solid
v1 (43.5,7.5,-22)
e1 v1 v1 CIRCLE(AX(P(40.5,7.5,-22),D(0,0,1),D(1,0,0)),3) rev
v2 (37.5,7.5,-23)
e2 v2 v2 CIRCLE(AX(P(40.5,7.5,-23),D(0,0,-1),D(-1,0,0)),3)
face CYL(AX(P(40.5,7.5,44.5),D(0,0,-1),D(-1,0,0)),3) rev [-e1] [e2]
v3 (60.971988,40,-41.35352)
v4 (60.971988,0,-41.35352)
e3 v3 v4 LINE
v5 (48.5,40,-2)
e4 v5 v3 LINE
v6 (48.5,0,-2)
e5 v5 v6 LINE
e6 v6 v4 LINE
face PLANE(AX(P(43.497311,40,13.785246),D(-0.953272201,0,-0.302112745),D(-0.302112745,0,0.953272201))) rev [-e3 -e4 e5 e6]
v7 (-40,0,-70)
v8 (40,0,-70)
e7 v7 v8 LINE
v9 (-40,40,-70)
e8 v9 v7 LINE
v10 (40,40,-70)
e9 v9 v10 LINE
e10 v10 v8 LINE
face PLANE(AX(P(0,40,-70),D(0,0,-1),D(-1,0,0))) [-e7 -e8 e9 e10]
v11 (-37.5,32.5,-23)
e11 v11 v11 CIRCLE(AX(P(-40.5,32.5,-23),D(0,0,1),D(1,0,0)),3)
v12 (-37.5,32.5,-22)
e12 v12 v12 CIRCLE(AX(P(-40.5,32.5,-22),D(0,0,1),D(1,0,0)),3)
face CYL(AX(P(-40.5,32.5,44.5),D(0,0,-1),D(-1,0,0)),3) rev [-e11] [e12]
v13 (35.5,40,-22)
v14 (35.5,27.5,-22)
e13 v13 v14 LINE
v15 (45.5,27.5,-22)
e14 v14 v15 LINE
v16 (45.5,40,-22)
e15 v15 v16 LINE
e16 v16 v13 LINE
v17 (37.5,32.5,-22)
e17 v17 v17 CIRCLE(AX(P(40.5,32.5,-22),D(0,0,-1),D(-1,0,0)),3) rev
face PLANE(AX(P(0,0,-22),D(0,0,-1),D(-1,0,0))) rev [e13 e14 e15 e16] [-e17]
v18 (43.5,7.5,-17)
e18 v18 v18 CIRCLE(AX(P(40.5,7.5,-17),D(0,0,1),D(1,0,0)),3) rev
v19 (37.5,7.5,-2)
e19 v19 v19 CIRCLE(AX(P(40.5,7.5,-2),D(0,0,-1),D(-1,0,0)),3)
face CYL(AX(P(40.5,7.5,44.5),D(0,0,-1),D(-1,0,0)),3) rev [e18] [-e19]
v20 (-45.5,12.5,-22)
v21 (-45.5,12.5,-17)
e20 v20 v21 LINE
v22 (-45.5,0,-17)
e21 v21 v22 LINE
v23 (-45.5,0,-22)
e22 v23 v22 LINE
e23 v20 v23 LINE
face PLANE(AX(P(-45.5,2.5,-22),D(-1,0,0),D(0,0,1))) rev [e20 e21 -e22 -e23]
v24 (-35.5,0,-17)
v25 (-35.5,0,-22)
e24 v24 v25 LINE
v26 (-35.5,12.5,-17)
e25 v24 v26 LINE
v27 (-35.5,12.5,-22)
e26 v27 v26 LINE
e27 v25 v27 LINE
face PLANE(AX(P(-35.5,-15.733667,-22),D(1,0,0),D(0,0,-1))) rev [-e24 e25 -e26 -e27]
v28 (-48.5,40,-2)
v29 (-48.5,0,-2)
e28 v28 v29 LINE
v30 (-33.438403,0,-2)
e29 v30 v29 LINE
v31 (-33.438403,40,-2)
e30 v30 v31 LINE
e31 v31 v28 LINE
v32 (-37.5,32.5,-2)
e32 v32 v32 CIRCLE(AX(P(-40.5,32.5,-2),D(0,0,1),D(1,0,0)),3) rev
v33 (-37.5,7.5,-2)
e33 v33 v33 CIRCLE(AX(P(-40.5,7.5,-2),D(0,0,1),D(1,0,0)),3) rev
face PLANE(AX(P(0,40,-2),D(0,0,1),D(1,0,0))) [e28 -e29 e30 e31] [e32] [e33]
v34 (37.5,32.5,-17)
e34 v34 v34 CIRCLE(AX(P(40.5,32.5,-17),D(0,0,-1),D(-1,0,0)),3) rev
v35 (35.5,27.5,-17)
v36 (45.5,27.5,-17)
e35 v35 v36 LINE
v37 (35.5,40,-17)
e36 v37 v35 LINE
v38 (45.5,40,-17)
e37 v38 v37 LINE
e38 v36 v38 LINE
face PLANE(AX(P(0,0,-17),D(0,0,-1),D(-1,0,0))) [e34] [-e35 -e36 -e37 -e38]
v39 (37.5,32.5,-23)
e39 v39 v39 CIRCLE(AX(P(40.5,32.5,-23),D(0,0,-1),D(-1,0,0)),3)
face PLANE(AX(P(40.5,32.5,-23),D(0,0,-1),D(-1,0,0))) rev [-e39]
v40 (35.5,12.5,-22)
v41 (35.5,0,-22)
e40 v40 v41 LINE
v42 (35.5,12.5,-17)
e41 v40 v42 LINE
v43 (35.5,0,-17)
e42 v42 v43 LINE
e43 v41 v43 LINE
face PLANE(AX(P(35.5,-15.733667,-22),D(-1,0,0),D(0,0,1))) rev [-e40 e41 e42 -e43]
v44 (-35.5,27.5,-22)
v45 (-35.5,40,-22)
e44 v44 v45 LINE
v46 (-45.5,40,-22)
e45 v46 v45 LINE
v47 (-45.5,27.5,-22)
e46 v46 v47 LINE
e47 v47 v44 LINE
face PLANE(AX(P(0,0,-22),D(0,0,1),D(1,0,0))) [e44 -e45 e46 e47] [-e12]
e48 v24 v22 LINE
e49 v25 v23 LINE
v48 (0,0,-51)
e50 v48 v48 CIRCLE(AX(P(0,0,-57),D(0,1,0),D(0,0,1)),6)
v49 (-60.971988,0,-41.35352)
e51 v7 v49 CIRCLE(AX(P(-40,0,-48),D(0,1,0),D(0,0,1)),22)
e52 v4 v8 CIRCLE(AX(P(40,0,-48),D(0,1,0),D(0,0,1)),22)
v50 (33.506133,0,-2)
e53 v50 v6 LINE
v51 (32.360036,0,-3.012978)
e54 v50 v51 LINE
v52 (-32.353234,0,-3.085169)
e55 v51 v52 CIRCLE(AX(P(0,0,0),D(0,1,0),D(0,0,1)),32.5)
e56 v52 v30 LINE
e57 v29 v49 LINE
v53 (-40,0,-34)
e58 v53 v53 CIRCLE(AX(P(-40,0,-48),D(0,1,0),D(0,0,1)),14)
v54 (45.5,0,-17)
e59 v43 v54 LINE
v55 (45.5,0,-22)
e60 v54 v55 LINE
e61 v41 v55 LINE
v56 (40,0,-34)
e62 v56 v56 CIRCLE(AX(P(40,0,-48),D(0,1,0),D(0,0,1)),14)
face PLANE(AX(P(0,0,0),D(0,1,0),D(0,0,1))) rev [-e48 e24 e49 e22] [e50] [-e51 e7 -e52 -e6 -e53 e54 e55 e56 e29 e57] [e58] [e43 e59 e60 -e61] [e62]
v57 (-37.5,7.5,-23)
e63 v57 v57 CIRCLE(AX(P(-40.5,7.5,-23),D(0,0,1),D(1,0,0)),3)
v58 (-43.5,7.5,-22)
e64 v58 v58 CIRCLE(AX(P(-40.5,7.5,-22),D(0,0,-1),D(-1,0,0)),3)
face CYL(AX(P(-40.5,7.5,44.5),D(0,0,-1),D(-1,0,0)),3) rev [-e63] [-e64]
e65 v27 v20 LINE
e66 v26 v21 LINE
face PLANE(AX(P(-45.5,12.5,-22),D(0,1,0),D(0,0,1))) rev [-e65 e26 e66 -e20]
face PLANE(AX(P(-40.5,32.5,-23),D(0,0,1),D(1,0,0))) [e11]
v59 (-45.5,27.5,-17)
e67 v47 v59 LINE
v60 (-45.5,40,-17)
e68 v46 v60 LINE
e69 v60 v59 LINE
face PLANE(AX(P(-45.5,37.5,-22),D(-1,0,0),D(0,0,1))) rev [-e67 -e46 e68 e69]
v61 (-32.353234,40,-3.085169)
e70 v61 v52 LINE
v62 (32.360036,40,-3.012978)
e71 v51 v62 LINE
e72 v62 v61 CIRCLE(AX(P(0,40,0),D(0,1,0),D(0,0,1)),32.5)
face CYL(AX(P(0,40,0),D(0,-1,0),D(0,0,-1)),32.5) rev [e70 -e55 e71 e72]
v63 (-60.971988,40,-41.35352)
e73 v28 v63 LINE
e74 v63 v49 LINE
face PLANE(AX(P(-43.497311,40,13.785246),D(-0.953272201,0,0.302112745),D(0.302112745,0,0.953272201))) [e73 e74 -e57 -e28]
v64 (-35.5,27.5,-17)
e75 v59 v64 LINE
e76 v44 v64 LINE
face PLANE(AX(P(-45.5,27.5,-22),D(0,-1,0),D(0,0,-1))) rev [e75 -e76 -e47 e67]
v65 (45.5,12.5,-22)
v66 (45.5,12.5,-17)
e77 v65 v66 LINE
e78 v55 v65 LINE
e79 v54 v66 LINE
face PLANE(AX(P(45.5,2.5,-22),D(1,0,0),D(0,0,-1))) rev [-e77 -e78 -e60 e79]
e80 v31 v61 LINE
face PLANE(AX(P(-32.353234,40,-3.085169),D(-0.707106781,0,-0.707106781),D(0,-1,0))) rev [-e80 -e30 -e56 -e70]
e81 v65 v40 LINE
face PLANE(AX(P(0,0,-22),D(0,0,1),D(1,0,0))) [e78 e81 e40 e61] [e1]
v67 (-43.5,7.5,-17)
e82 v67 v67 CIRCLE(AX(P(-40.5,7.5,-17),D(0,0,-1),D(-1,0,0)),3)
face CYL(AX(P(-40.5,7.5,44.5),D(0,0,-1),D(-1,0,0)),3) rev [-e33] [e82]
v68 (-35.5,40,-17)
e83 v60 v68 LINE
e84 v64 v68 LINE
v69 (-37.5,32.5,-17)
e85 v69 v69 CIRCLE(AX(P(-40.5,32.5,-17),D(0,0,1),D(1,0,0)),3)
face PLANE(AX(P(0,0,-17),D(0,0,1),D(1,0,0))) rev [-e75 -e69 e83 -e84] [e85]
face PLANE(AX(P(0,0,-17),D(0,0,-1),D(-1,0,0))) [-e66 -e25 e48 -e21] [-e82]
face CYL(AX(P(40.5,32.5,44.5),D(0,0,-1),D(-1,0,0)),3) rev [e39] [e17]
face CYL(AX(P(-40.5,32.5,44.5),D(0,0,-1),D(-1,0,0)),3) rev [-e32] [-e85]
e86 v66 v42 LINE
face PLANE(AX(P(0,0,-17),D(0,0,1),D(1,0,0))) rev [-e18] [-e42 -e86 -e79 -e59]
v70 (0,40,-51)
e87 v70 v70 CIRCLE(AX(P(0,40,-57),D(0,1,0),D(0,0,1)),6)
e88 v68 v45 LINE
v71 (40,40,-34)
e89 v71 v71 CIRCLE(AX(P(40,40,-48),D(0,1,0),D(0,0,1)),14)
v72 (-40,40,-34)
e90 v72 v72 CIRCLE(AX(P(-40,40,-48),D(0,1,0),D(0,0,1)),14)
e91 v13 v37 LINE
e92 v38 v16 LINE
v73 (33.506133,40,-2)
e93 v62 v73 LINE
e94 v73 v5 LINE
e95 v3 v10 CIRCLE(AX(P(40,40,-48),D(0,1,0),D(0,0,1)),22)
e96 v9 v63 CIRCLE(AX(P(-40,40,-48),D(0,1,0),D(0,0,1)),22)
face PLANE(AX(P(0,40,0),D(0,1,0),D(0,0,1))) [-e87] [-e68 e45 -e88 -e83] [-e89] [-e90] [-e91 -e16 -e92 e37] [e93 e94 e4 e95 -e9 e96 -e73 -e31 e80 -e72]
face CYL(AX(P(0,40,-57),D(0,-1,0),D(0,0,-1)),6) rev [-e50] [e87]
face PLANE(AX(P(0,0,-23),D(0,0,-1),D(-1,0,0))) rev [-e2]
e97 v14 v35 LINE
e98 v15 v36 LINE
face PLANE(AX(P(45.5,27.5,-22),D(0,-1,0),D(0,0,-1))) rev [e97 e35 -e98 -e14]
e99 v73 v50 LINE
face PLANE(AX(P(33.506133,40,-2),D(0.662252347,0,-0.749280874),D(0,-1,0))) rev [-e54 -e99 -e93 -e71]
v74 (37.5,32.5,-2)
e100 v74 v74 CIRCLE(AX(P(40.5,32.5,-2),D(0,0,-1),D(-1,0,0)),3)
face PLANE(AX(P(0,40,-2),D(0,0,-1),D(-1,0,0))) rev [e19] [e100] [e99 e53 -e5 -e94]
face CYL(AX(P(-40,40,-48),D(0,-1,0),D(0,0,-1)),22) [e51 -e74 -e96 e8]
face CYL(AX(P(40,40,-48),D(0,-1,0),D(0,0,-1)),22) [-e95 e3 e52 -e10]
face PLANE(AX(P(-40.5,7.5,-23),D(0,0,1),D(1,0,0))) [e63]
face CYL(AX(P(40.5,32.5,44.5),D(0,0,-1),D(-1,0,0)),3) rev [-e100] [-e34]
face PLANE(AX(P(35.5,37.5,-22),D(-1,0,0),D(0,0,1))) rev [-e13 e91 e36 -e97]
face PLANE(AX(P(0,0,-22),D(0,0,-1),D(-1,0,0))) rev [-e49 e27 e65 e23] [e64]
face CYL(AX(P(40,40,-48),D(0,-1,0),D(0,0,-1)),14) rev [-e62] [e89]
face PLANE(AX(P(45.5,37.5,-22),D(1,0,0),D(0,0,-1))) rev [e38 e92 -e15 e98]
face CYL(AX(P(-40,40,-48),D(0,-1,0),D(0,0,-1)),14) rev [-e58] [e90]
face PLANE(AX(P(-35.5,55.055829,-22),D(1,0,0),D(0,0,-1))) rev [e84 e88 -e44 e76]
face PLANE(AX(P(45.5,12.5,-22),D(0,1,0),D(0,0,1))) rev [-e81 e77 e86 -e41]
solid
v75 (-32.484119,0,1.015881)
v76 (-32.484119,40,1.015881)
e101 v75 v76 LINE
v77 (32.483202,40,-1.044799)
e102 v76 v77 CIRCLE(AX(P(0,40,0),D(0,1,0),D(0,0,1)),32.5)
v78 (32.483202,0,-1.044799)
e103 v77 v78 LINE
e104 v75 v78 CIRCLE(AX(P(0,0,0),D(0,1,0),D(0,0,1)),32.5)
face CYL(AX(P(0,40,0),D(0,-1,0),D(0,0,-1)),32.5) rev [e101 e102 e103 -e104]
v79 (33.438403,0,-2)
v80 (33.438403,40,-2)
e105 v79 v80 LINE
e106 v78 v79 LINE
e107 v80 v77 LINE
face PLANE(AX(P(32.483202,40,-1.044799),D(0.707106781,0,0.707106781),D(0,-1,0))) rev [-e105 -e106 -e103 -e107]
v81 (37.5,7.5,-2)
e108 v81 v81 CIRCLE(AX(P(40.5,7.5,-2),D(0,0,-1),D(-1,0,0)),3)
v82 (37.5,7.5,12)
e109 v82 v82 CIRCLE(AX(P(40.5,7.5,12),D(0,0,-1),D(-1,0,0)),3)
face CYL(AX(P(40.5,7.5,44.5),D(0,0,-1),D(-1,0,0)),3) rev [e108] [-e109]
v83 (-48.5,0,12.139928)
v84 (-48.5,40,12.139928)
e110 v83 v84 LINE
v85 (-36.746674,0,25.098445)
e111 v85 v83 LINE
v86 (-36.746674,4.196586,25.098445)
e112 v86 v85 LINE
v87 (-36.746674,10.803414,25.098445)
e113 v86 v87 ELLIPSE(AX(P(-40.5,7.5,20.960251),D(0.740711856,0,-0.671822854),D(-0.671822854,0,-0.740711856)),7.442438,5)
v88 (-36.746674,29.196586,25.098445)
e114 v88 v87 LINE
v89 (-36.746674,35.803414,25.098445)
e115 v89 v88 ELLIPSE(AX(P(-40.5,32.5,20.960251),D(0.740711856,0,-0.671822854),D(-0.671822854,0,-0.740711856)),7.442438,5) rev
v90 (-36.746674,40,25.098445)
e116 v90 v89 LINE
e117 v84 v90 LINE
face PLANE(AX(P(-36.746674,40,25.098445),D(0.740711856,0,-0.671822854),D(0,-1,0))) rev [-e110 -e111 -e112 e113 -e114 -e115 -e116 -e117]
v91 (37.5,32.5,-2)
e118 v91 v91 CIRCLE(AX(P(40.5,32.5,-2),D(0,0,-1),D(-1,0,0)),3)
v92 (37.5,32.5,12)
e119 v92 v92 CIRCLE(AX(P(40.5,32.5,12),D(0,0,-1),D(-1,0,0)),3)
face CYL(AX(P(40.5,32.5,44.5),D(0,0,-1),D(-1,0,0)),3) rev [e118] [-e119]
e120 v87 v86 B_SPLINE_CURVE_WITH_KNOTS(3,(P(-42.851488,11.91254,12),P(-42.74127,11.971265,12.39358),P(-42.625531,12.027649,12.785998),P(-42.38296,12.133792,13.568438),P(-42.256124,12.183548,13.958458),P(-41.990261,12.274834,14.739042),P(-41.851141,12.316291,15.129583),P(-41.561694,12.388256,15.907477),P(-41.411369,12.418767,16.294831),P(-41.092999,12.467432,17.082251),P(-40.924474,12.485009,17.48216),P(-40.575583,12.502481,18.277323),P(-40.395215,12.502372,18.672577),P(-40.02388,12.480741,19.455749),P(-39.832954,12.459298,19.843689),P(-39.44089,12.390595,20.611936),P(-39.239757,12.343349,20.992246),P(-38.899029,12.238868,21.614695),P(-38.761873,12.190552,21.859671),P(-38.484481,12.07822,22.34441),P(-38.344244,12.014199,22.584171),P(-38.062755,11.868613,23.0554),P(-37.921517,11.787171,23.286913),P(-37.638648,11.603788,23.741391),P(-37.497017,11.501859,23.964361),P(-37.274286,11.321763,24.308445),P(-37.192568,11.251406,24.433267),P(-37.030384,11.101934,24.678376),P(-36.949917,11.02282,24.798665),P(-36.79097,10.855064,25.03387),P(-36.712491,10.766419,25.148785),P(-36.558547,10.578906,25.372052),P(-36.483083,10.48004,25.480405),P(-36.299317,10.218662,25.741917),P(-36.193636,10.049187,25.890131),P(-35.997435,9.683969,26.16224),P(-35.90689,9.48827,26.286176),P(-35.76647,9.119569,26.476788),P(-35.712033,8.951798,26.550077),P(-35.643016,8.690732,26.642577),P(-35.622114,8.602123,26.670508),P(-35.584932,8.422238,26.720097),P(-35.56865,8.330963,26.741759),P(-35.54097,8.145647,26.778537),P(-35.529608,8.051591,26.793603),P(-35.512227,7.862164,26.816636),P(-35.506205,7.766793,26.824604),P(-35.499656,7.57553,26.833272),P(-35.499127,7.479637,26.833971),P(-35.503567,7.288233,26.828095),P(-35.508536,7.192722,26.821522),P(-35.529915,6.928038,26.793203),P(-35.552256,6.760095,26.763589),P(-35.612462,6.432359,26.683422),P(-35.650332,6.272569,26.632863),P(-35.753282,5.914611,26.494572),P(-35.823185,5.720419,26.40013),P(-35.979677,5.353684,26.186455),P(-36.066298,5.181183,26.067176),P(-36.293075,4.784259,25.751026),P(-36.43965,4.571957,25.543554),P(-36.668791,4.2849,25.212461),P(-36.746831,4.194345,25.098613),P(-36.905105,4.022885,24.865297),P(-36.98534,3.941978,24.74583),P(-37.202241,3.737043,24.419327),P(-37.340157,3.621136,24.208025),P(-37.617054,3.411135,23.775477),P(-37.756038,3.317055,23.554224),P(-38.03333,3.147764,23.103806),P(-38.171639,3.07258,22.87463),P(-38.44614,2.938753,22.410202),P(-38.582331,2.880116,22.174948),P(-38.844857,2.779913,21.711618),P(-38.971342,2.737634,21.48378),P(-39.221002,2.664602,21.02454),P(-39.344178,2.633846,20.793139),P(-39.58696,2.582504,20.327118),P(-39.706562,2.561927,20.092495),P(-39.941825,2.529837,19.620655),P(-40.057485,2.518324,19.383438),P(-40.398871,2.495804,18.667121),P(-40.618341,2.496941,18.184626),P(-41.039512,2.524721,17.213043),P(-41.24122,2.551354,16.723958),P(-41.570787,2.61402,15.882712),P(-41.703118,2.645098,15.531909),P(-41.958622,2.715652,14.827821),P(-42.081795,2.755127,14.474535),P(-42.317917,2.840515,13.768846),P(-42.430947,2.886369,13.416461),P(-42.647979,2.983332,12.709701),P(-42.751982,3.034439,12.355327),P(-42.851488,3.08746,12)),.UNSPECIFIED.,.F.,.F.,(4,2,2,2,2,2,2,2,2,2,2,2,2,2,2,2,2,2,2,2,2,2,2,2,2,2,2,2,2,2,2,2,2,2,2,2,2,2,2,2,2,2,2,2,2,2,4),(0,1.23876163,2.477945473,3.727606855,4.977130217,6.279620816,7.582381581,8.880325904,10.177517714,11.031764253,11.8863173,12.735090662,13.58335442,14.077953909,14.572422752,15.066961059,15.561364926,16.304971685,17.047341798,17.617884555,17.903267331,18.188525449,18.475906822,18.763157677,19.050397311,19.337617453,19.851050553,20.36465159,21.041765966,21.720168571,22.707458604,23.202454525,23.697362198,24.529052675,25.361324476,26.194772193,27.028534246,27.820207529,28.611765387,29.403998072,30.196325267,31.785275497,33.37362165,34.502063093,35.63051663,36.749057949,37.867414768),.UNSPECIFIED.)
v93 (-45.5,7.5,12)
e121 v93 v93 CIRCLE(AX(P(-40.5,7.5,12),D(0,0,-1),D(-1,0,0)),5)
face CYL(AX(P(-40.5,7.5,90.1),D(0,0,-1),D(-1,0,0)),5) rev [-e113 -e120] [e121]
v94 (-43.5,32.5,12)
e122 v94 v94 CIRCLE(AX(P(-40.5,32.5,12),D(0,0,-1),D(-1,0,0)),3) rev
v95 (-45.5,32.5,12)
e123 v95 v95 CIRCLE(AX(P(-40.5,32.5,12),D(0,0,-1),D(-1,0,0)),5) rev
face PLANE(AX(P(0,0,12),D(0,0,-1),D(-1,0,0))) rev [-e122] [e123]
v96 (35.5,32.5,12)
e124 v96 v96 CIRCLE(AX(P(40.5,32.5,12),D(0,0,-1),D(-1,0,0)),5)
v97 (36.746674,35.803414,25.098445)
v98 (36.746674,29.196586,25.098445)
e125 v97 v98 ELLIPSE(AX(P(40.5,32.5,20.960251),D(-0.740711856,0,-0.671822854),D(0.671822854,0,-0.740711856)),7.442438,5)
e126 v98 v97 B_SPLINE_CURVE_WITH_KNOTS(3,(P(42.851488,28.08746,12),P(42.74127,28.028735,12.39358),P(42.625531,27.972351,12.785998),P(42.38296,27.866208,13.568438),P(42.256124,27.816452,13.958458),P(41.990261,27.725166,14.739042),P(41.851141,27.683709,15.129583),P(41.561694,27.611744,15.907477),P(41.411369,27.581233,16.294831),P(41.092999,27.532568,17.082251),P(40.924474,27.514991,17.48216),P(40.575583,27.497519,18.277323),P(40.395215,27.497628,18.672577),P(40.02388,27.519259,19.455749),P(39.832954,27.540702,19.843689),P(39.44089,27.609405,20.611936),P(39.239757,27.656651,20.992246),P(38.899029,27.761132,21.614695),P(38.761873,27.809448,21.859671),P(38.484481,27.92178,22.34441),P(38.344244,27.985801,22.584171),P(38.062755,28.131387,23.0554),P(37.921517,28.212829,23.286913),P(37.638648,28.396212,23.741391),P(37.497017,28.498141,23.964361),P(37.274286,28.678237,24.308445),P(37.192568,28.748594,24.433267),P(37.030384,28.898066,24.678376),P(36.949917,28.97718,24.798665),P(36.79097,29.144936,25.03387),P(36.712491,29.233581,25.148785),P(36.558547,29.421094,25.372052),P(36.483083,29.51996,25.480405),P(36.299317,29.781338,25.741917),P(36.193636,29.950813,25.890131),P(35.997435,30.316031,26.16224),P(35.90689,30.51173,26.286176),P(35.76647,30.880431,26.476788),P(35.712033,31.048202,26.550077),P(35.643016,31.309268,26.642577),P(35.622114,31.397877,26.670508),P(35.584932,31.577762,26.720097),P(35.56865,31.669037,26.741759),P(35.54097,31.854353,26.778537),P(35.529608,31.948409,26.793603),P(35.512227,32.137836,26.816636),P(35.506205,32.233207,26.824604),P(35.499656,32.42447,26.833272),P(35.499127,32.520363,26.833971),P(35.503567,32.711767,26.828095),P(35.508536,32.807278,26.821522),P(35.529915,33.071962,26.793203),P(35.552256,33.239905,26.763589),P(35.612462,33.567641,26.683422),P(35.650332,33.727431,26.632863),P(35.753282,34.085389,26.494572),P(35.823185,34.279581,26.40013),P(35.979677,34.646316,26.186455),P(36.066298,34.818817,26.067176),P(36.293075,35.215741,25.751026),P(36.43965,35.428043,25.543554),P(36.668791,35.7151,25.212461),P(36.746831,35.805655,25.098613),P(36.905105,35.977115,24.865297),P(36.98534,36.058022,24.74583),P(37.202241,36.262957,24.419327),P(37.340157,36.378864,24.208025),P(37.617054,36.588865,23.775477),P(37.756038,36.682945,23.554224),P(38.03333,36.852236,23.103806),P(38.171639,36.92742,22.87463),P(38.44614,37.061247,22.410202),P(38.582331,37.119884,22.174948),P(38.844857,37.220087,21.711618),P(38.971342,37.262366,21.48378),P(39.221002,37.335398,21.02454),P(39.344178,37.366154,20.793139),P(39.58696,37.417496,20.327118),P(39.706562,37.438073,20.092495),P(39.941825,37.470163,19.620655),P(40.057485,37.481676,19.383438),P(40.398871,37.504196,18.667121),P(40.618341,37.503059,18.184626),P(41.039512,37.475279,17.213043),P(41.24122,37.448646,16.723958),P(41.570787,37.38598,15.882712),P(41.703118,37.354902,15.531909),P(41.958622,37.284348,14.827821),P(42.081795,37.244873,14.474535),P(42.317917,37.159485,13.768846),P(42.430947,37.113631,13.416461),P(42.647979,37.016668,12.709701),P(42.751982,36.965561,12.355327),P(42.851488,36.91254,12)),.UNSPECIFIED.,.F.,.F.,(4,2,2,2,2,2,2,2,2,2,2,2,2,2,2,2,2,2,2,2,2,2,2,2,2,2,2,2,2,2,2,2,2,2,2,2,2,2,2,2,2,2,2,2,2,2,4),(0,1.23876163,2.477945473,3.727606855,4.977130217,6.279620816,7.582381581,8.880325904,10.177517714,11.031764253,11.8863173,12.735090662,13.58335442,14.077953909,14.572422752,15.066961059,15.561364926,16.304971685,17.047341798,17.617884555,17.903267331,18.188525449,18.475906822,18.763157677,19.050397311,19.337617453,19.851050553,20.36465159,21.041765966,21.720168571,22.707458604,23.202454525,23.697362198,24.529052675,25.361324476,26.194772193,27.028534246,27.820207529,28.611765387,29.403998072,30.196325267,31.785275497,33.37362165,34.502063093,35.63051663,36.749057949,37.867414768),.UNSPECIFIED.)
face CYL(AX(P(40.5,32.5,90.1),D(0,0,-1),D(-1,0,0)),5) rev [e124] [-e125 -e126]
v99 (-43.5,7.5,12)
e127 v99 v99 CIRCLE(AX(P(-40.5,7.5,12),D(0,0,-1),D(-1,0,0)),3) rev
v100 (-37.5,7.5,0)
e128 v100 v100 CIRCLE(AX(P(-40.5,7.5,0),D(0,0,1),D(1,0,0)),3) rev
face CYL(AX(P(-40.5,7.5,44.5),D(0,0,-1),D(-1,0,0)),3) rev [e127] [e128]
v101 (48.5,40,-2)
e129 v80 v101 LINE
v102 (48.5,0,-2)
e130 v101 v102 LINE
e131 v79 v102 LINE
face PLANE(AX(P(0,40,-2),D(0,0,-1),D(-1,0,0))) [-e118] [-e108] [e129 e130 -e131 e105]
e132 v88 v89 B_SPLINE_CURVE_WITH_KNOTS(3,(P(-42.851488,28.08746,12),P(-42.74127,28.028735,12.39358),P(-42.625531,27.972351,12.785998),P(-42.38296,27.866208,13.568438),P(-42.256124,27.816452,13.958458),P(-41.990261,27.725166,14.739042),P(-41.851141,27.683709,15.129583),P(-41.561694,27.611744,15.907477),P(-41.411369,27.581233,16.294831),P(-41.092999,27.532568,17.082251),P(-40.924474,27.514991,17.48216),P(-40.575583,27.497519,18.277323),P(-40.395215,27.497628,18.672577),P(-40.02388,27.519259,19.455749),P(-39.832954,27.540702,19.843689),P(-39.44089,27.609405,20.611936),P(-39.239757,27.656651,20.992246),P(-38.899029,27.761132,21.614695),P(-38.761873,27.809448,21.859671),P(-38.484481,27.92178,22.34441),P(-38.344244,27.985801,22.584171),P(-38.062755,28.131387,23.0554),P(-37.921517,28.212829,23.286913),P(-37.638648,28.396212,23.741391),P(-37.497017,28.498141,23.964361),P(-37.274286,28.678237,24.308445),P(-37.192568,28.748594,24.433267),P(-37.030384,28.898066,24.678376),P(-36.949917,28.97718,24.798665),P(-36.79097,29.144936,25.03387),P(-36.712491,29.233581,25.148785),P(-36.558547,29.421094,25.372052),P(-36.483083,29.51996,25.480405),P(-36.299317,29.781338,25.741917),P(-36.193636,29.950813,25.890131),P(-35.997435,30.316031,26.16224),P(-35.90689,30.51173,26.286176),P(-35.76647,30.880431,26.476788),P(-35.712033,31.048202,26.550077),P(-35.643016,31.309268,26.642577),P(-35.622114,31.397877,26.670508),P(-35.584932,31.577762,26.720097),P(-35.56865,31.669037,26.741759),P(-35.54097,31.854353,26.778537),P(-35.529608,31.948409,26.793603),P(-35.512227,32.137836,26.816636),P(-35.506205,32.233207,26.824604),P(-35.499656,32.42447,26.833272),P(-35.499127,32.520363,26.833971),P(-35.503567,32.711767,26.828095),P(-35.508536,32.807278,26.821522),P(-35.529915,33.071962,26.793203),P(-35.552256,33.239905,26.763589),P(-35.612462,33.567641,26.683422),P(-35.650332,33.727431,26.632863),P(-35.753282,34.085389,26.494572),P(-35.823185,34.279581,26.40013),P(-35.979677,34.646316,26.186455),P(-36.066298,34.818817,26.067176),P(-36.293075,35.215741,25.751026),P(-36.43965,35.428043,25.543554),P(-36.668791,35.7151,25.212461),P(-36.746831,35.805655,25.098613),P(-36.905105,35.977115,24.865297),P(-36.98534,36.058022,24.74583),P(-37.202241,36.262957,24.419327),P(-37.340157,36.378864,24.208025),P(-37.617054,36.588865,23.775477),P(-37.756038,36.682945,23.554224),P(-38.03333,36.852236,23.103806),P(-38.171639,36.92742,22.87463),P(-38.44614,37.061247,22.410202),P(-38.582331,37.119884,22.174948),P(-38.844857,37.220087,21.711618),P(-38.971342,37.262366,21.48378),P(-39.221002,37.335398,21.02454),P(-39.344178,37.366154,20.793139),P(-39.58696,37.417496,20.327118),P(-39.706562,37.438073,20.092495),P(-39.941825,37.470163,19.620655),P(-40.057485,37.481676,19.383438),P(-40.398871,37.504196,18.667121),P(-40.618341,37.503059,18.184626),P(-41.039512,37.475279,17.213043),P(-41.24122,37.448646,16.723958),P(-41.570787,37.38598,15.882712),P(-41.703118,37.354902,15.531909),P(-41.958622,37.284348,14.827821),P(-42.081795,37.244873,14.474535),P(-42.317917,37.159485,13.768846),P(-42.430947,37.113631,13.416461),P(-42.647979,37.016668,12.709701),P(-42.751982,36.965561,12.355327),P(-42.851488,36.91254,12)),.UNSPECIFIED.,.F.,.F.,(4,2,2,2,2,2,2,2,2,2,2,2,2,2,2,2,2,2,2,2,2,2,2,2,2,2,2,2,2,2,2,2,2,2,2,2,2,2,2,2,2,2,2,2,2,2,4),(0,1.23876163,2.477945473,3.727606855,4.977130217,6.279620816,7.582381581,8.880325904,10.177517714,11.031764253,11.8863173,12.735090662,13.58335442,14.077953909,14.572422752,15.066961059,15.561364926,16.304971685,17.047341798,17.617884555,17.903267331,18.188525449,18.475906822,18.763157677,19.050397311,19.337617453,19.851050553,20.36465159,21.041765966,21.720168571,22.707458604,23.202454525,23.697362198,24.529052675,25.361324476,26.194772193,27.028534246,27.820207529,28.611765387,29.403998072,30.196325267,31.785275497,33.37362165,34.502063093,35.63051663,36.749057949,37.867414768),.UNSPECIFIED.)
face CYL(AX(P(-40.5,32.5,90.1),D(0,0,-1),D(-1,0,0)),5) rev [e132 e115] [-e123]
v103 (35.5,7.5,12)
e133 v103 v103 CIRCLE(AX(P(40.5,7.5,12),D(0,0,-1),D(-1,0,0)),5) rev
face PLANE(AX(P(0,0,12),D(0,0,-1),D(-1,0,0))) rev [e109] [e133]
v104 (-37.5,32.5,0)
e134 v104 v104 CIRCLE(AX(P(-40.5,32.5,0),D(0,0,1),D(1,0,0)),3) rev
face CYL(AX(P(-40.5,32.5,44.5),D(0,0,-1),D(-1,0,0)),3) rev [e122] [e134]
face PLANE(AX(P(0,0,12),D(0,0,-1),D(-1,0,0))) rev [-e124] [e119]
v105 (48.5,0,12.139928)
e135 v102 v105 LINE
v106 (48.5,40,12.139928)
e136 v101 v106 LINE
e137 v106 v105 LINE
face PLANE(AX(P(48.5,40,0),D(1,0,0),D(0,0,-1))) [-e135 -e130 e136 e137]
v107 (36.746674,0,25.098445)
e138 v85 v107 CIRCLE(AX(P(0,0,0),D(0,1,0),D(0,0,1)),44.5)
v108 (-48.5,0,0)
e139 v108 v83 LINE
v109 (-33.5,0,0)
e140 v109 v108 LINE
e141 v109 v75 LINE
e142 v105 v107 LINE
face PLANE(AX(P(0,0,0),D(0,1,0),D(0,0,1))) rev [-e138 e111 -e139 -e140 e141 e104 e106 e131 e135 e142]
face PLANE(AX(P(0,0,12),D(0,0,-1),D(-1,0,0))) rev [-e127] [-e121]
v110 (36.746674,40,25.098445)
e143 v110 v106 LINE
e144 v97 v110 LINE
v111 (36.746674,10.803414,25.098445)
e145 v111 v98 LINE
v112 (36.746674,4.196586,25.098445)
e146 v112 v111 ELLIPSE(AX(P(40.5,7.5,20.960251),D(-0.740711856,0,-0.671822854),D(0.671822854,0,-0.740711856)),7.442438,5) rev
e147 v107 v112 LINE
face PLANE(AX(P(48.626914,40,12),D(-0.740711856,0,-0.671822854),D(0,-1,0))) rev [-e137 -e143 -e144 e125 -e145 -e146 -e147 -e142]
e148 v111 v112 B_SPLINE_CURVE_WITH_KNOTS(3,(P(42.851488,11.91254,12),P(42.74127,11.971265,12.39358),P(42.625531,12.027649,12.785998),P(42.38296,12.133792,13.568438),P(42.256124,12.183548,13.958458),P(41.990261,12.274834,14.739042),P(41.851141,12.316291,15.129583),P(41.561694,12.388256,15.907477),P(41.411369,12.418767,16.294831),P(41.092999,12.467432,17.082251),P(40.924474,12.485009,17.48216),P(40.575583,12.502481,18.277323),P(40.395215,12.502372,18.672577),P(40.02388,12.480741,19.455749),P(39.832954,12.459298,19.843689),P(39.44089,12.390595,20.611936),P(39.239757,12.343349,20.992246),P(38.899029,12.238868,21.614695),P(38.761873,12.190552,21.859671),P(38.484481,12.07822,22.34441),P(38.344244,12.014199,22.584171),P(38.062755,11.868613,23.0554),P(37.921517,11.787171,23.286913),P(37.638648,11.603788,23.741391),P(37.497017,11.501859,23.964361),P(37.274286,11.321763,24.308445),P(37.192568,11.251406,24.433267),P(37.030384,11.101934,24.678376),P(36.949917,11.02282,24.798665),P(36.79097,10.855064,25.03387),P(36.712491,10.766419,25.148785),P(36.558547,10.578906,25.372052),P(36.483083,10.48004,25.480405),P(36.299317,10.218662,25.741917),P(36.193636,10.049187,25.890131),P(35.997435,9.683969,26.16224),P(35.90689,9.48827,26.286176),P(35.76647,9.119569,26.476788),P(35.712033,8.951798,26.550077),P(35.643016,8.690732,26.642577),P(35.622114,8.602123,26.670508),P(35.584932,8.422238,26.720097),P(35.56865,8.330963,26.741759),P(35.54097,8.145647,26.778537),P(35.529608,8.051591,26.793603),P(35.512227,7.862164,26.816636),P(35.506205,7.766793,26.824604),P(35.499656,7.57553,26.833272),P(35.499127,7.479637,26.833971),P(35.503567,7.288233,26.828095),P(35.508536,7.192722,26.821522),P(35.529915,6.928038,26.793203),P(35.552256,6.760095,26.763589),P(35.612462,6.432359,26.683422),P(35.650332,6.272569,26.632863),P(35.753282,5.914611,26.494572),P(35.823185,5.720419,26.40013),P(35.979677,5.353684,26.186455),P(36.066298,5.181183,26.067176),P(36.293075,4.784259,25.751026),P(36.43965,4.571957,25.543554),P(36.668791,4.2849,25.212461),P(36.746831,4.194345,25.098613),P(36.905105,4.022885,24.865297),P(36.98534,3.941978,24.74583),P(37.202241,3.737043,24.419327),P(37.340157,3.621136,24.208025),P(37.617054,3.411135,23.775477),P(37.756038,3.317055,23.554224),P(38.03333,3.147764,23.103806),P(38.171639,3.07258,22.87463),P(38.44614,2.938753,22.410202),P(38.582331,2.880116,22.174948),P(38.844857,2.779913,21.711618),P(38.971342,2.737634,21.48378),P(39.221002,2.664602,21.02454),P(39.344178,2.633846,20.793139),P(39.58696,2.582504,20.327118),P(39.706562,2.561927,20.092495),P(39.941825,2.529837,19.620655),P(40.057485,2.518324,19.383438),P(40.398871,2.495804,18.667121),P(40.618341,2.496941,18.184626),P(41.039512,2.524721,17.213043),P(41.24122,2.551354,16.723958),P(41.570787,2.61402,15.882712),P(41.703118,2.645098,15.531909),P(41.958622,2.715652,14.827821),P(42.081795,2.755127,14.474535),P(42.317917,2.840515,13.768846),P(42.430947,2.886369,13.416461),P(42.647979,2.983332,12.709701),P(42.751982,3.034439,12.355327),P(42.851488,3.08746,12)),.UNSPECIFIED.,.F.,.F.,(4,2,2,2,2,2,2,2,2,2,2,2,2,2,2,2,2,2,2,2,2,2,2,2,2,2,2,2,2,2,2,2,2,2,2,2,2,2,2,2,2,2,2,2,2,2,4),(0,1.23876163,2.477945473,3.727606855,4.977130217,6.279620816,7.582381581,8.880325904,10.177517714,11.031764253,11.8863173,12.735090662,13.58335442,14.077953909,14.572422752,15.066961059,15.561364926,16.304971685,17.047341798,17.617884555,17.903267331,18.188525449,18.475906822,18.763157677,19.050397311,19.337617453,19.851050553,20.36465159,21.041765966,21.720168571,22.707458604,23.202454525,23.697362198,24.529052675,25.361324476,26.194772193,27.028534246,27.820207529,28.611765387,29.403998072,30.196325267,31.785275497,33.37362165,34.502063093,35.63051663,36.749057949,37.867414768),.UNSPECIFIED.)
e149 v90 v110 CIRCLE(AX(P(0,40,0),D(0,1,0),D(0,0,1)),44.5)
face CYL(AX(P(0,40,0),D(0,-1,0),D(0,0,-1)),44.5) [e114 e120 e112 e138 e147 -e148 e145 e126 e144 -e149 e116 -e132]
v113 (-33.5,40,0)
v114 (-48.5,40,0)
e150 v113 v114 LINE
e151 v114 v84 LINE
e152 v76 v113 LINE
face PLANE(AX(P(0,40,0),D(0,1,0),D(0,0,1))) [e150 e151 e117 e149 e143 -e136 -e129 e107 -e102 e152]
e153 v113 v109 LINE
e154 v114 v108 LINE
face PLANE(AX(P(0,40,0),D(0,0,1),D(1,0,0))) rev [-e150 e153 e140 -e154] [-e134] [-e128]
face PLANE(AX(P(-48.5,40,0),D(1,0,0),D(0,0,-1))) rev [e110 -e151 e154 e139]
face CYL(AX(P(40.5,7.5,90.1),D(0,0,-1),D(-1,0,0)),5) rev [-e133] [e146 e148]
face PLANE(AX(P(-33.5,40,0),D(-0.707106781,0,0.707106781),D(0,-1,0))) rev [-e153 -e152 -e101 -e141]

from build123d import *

# Parameters (mm, degrees)
SKETCH1_R               = 14
SKETCH1_R_2             = 6
BOSS_EXTRUDE1_DEPTH     = 40
BOSS_EXTRUDE2_DEPTH     = 40
SKETCH2_R               = 5
SKETCH2_R_2             = 3
CUT_EXTRUDE1_DEPTH      = 78.1
CUT_EXTRUDE2_DEPTH      = 111.308657901
CUT_EXTRUDE2_DEPTH_BACK = 35
SKETCH2_3_R             = 3
CUT_EXTRUDE3_DEPTH      = 5
CHAMFER2_SIZE           = 1
CHAMFER2_SIZE_2         = 1.067730124
CHAMFER3_SIZE           = 1


with BuildPart() as part:
    # Sketch1 → Boss-Extrude1 (new body)
    with BuildSketch(Plane(origin=(0, 0, 0), x_dir=(1, 0, 0), z_dir=(0, 1, 0))):
        with BuildLine():
            Line((-40, 70), (40, 70))
            ThreePointArc((40, 70), (57.751374155, 60.995719126), (60.97198842, 41.353519599))
            Line((60.97198842, 41.353519599), (48.5, 2))
            Line((48.5, 2), (32.438403167, 2))
            ThreePointArc((32.438403167, 2), (0, 32.5), (-32.438403167, 2))
            Line((-32.438403167, 2), (-48.5, 2))
            Line((-48.5, 2), (-60.97198842, 41.353519599))
            ThreePointArc((-60.97198842, 41.353519599), (-57.751374155, 60.995719126), (-40, 70))
        make_face()
        with Locations(Location((40, 48, 0), (0, 0, 270))):
            Circle(SKETCH1_R, mode=Mode.SUBTRACT)
        with Locations(Location((-40, 48, 0), (0, 0, 270))):
            Circle(SKETCH1_R, mode=Mode.SUBTRACT)
        with Locations(Location((0, 57, 0), (0, 0, 270))):
            Circle(SKETCH1_R_2, mode=Mode.SUBTRACT)
    extrude(amount=BOSS_EXTRUDE1_DEPTH)


with BuildPart() as body_2:
    # Sketch1<3> → Boss-Extrude2 (new, through all)
    with BuildSketch(Plane(origin=(0, 0, 0), x_dir=(1, 0, 0), z_dir=(0, 1, 0))):
        with BuildLine():
            Line((48.5, 2), (32.438403167, 2))
            ThreePointArc((32.438403167, 2), (1.000474159, -32.484597142), (-32.5, 0))
            Line((-32.5, 0), (-48.5, 0))
            Line((-48.5, 0), (-48.5, -12))
            Line((-48.5, -12), (-42.851487722, -12))
            ThreePointArc((-42.851487722, -12), (0, -44.5), (42.851487722, -12))
            Line((42.851487722, -12), (48.5, -12))
            Line((48.5, -12), (48.5, 2))
        make_face()
    extrude(amount=BOSS_EXTRUDE2_DEPTH)

    # Chamfer1
    # the kernel refuses this chamfer: 18, 9 mm, written as the material it adds along each edge
    with BuildSketch(Plane(origin=(-42.851487722, 0, 12), x_dir=(-1, 0, 0), z_dir=(0, 1, 0))) as chamfer1_piece_1_section:
        with BuildLine():
            Line((6.259138875, -0.533312536), (-6.588525819, 13.631757182))
            Line((-6.588525819, 13.631757182), (-6.885802285, 13.428713585))
            ThreePointArc((-6.885802285, 13.428713585), (-2.991055083, 6.960103108), (-0.346663721, -0.097078652))
            Line((-0.346663721, -0.097078652), (0, -0.36))
            ThreePointArc((0, -0.36), (3.129569437, -0.36), (6.259138875, -0.893312536))
            Line((6.259138875, -0.893312536), (6.259138875, -0.533312536))
        make_face()
    chamfer1_piece_1 = extrude(amount=40, mode=Mode.PRIVATE)
    chamfer1_piece_1 = split(chamfer1_piece_1, bisect_by=Plane(origin=(-48.5, 0, 12), z_dir=(1, 0, 0)), keep=Keep.TOP, mode=Mode.PRIVATE)
    add(chamfer1_piece_1)
    with BuildSketch(Plane(origin=(42.851487722, 0, 12), x_dir=(1, 0, 0), z_dir=(0, 1, 0))) as chamfer1_piece_2_section:
        with BuildLine():
            Line((6.259138875, 0.533312536), (-6.588525819, -13.631757182))
            Line((-6.588525819, -13.631757182), (-6.885802285, -13.428713585))
            ThreePointArc((-6.885802285, -13.428713585), (-2.991055083, -6.960103108), (-0.346663721, 0.097078652))
            Line((-0.346663721, 0.097078652), (0, 0.36))
            ThreePointArc((0, 0.36), (3.129569437, 0.36), (6.259138875, 0.893312536))
            Line((6.259138875, 0.893312536), (6.259138875, 0.533312536))
        make_face()
    chamfer1_piece_2 = extrude(amount=40, mode=Mode.PRIVATE)
    chamfer1_piece_2 = split(chamfer1_piece_2, bisect_by=Plane(origin=(48.5, 0, 12), z_dir=(-1, 0, 0)), keep=Keep.TOP, mode=Mode.PRIVATE)
    add(chamfer1_piece_2)

    # Sketch2 → Cut-Extrude1 (cut)
    # profile 1 of 4: a face of its own
    with BuildSketch(Plane.XY.offset(12)):
        with Locations(Location((-40.5, 32.5, 0), (0, 0, 180))):
            Circle(SKETCH2_R)
        with Locations(Location((-40.5, 32.5, 0), (0, 0, 180))):
            Circle(SKETCH2_R_2, mode=Mode.SUBTRACT)
    # profile 2 of 4: a face of its own
    with BuildSketch(Plane.XY.offset(12)):
        with Locations(Location((-40.5, 7.5, 0), (0, 0, 180))):
            Circle(SKETCH2_R)
        with Locations(Location((-40.5, 7.5, 0), (0, 0, 180))):
            Circle(SKETCH2_R_2, mode=Mode.SUBTRACT)
    # profile 3 of 4: a face of its own
    with BuildSketch(Plane.XY.offset(12)):
        with Locations(Location((40.5, 7.5, 0), (0, 0, 180))):
            Circle(SKETCH2_R)
        with Locations(Location((40.5, 7.5, 0), (0, 0, 180))):
            Circle(SKETCH2_R_2, mode=Mode.SUBTRACT)
    # profile 4 of 4: a face of its own
    with BuildSketch(Plane.XY.offset(12)):
        with Locations(Location((40.5, 32.5, 0), (0, 0, 180))):
            Circle(SKETCH2_R)
    extrude(amount=CUT_EXTRUDE1_DEPTH, mode=Mode.SUBTRACT)


with BuildPart() as cut_extrude2_tool:
    # Sketch2<3> → Cut-Extrude2 (new, two sides: drawn at the far end of the back side and taken through both)
    with BuildSketch(Plane.XY.offset(12).offset(-CUT_EXTRUDE2_DEPTH_BACK)):
        with Locations(Location((40.5, 7.5, 0), (0, 0, 180))):
            Circle(SKETCH2_3_R)
        with Locations(Location((-40.5, 32.5, 0), (0, 0, 180))):
            Circle(SKETCH2_3_R)
        with Locations(Location((-40.5, 7.5, 0), (0, 0, 180))):
            Circle(SKETCH2_3_R)
        with Locations(Location((40.5, 32.5, 0), (0, 0, 180))):
            Circle(SKETCH2_3_R)
    extrude(amount=CUT_EXTRUDE2_DEPTH + CUT_EXTRUDE2_DEPTH_BACK)


with BuildPart() as part_1:
    add(part.part)

    # Cut-Extrude2: cut by cut_extrude2_tool
    add(cut_extrude2_tool.part, mode=Mode.SUBTRACT)

    # Sketch3 → Cut-Extrude3 (cut)
    with BuildSketch(Plane.XY.offset(-17)):
        Polygon((-45.5, 37.5), (-45.5, 55.055829491), (-35.5, 55.055829491), (-35.5, 37.5), (-35.5, 27.5), (-45.5, 27.5), align=None)
        Polygon((-45.5, 2.5), (-45.5, 12.5), (-35.5, 12.5), (-35.5, 2.5), (-35.5, -15.733667286), (-45.5, -15.733667286), align=None)
        Polygon((35.5, -15.733667286), (35.5, 2.5), (35.5, 12.5), (45.5, 12.5), (45.5, 2.5), (45.5, -15.733667286), align=None)
        Polygon((35.5, 55.055829491), (35.5, 37.5), (35.5, 27.5), (45.5, 27.5), (45.5, 37.5), (45.5, 55.055829491), align=None)
    extrude(amount=-CUT_EXTRUDE3_DEPTH, mode=Mode.SUBTRACT)

    # Chamfer2
    # the kernel refuses this chamfer: 1.067730124, 1 mm, written as the material it takes off along each edge
    with BuildSketch(Plane(origin=(-32.438403167, -2.803300673, -2), x_dir=(-1, 0, 0), z_dir=(0, 1, 0))) as chamfer2_piece_1:
        with BuildLine():
            Line((CHAMFER2_SIZE, 0), (-0.085169492, -1.085169492))
            ThreePointArc((-0.085169492, -1.085169492), (-0.039316375, -0.559135608), (0, 0))
            Line((0, 0), (CHAMFER2_SIZE, 0))
        make_face()
    extrude(amount=45.606601345, mode=Mode.SUBTRACT)
    with BuildSketch(Plane(origin=(32.438403167, -2.75023745, -2), x_dir=(1, 0, 0), z_dir=(0, 1, 0))) as chamfer2_piece_2:
        with BuildLine():
            Line((CHAMFER2_SIZE_2, 0), (-0.078366679, 1.012978342))
            ThreePointArc((-0.078366679, 1.012978342), (-0.036411724, 0.52209249), (0, 0))
            Line((0, 0), (CHAMFER2_SIZE_2, 0))
        make_face()
    extrude(amount=45.5004749, mode=Mode.SUBTRACT)


with BuildPart() as body_2_1:
    add(body_2.part)

    # Cut-Extrude2: cut by cut_extrude2_tool
    add(cut_extrude2_tool.part, mode=Mode.SUBTRACT)

    # Chamfer3
    # the kernel refuses this chamfer: 1, 0.943713907 mm, written as the material it takes off along each edge
    with BuildSketch(Plane(origin=(-32.5, -2.612747277, 0), x_dir=(-1, 0, 0), z_dir=(0, 1, 0))) as chamfer3_piece_1:
        with BuildLine():
            Line((CHAMFER3_SIZE, 0), (-0.015881022, 1.015881022))
            ThreePointArc((-0.015881022, 1.015881022), (-0.00419828, 0.522370138), (0, 0))
            Line((0, 0), (CHAMFER3_SIZE, 0))
        make_face()
    extrude(amount=45.225494555, mode=Mode.SUBTRACT)
    with BuildSketch(Plane(origin=(32.438403167, -2.571682988, -2), x_dir=(0.046848125070118624, 0, 0.9989020238128535), z_dir=(0, 1, 0))) as chamfer3_piece_2:
        with BuildLine():
            Line((0.956251358, 0), (CHAMFER3_SIZE * 0.0468481250701, CHAMFER3_SIZE * 0.998902023813))
            Line((CHAMFER3_SIZE * 0.0468481250701, CHAMFER3_SIZE * 0.998902023813), (0, 0))
            ThreePointArc((0, 0), (0.491597341, 0.003514385), (0.956251358, 0))
        make_face()
    extrude(amount=45.143365976, mode=Mode.SUBTRACT)


solid = Compound([part_1.part, body_2_1.part])
